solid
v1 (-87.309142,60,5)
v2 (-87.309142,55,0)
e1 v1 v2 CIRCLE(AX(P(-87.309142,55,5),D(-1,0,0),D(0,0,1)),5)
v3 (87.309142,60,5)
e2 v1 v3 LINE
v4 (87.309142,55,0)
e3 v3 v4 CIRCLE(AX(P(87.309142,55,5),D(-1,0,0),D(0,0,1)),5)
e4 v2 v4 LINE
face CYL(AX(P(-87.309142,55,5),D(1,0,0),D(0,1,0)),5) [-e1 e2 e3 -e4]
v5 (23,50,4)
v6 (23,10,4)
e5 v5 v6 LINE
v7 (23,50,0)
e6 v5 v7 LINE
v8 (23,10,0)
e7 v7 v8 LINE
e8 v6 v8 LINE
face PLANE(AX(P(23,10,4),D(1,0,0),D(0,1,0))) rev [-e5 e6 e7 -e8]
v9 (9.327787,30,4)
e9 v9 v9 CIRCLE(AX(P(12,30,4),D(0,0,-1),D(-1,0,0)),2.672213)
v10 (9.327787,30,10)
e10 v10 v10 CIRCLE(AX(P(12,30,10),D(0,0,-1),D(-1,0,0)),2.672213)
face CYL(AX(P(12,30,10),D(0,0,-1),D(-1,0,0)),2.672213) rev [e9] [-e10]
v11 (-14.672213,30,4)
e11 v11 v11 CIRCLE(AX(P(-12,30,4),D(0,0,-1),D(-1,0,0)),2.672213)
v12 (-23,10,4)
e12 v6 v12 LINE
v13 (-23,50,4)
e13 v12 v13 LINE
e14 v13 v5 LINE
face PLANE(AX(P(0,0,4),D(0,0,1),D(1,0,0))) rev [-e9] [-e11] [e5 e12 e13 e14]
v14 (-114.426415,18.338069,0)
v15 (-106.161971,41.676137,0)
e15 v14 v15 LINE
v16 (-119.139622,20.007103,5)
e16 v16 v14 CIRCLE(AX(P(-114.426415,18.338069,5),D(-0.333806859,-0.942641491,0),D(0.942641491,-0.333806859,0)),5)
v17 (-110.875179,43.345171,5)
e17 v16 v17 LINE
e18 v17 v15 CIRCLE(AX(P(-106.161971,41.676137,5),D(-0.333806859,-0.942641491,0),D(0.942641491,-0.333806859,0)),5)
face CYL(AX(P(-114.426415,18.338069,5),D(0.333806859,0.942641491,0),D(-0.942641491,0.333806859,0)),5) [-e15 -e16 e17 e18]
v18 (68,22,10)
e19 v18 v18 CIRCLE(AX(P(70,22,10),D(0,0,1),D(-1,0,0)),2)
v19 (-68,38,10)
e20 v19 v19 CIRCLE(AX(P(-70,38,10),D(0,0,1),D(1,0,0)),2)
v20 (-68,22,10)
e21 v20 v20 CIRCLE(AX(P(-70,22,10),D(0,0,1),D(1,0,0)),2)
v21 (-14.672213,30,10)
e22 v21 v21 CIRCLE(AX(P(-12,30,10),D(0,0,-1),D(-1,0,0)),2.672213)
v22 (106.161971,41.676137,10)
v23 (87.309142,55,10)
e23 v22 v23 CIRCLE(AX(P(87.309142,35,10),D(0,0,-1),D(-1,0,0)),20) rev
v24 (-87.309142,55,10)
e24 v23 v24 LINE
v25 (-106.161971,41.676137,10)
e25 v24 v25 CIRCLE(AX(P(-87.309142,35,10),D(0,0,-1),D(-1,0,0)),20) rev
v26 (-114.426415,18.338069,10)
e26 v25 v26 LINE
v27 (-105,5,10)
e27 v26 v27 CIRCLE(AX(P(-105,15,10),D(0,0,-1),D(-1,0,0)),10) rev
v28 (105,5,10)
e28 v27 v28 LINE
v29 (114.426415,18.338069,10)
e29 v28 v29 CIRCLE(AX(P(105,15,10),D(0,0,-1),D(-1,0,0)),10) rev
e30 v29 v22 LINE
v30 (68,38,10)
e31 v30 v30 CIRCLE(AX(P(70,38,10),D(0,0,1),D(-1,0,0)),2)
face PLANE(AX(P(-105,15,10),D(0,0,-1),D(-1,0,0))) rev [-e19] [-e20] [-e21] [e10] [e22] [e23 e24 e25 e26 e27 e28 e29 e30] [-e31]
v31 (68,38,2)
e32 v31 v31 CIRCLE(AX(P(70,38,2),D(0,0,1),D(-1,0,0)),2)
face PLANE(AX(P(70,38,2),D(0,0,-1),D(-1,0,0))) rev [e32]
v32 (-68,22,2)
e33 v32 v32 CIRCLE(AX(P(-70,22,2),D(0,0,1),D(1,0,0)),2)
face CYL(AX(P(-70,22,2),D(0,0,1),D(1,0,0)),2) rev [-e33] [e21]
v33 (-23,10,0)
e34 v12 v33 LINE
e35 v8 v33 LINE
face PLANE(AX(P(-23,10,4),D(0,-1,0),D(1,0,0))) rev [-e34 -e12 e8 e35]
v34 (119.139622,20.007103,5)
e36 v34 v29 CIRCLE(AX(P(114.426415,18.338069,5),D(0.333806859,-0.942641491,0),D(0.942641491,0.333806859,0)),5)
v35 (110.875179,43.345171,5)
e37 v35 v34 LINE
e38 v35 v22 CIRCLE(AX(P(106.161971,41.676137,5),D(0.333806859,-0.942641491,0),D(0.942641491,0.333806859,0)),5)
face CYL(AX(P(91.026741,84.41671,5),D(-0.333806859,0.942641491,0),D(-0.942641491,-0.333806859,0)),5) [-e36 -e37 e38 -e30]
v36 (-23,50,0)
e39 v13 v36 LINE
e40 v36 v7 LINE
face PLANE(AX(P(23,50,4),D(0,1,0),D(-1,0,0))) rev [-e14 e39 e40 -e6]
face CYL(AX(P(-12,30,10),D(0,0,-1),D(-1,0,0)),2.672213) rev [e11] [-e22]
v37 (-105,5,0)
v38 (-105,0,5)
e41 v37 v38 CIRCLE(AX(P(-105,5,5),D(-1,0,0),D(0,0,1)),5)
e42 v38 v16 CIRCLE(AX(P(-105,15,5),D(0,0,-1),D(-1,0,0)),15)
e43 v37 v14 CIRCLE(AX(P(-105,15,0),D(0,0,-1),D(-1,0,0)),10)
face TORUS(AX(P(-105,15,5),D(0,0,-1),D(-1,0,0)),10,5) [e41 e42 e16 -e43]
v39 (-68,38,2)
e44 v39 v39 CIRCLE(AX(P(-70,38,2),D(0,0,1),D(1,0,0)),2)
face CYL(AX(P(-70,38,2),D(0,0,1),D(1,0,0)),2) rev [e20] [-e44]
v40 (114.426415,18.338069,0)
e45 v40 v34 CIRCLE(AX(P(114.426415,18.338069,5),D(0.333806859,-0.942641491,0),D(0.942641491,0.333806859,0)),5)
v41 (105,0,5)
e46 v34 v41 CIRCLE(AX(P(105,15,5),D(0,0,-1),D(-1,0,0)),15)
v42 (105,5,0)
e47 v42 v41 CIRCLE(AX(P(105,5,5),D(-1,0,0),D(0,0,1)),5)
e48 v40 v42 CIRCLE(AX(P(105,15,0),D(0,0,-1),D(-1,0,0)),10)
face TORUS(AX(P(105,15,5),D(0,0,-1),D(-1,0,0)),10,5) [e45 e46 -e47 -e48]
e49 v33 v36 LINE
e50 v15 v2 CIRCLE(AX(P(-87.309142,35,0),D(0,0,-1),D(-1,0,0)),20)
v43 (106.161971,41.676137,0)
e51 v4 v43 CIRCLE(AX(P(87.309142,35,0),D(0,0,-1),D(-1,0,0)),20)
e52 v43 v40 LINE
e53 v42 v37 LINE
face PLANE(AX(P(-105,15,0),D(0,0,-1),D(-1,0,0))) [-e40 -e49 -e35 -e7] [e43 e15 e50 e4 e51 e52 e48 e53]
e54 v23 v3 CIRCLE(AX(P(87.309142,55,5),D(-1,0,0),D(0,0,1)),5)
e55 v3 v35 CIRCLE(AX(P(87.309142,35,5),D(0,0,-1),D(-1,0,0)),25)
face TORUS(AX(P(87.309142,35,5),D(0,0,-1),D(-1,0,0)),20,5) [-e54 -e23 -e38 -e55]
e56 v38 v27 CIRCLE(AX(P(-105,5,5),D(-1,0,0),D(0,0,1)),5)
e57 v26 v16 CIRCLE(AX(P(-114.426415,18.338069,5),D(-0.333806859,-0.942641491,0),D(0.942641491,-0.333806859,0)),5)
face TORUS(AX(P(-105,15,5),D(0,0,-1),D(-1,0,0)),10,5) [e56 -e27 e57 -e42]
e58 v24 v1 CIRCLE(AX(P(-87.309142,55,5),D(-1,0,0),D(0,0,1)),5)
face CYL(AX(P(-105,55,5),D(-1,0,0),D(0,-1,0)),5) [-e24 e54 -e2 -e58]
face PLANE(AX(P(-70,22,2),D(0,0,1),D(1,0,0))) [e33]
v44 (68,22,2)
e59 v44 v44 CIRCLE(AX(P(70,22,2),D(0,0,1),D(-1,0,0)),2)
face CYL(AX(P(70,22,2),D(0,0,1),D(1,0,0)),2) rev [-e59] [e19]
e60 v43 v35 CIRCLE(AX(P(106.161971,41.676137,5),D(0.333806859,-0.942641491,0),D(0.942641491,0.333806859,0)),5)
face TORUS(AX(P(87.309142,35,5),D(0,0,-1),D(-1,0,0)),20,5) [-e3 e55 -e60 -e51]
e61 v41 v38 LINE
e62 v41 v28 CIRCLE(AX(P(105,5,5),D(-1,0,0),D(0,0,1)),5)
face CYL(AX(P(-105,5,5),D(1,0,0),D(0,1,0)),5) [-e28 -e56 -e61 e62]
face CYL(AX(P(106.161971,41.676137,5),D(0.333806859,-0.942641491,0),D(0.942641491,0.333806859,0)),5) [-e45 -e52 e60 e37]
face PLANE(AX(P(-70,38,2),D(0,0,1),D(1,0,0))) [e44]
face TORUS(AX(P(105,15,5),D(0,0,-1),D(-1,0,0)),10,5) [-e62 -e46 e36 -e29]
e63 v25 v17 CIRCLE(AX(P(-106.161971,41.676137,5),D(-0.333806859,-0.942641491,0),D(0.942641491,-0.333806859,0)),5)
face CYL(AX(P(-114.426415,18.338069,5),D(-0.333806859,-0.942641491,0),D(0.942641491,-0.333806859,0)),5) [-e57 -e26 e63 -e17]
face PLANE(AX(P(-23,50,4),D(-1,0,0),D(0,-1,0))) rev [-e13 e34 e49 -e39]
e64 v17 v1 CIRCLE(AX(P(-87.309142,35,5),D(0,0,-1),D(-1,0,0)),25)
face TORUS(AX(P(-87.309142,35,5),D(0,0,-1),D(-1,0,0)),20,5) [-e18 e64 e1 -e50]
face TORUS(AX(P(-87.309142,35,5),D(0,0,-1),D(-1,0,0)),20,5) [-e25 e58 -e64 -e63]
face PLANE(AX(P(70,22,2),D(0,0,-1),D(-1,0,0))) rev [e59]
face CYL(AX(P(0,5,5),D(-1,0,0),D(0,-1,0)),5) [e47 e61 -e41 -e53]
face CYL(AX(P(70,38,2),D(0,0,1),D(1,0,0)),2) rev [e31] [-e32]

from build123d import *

# Parameters (mm, degrees)
BOSS_EXTRUDE1_DEPTH = 10
SKETCH2_R           = 2
CUT_EXTRUDE1_DEPTH  = 8
FILLET1_R           = 5
SKETCH3_W           = 46
SKETCH3_H           = 40
CUT_EXTRUDE2_DEPTH  = 4
SKETCH4_R           = 2.672212582
CUT_EXTRUDE3_DEPTH  = 135.298175803


with BuildPart() as part:
    # Sketch1 → Boss-Extrude1 (new body)
    with BuildSketch(Plane.XY):
        with BuildLine():
            Line((0, 0), (-105, 0))
            ThreePointArc((-105, 0), (-117.249623327, 6.342822149), (-119.139622366, 20.007102889))
            Line((-119.139622366, 20.007102889), (-110.875178831, 43.345171481))
            ThreePointArc((-110.875178831, 43.345171481), (-101.737771304, 55.416038879), (-87.309141554, 60))
            Line((-87.309141554, 60), (87.309141554, 60))
            ThreePointArc((87.309141554, 60), (101.737771304, 55.416038879), (110.875178831, 43.345171481))
            Line((110.875178831, 43.345171481), (119.139622366, 20.007102889))
            ThreePointArc((119.139622366, 20.007102889), (117.249623327, 6.342822149), (105, 0))
            Line((105, 0), (0, 0))
        make_face()
    extrude(amount=BOSS_EXTRUDE1_DEPTH)

    # Sketch2 → Cut-Extrude1 (cut)
    with BuildSketch(Plane.XY.offset(10)):
        with Locations((-70, 22)):
            Circle(SKETCH2_R)
        with Locations((-70, 38)):
            Circle(SKETCH2_R)
        with Locations(Location((70, 22, 0), (0, 0, 180))):
            Circle(SKETCH2_R)
        with Locations(Location((70, 38, 0), (0, 0, 180))):
            Circle(SKETCH2_R)
    extrude(amount=-CUT_EXTRUDE1_DEPTH, mode=Mode.SUBTRACT)

    # Fillet1
    fillet1_edges = [part.edges().sort_by_distance(p)[0] for p in [
        (-117.249623327, 6.342822149, 0),
        (-115.007400599, 31.676137185, 0),
        (-101.737771304, 55.416038879, 0),
        (0, 60, 0),
        (101.737771304, 55.416038879, 0),
        (115.007400599, 31.676137185, 0),
        (117.249623327, 6.342822149, 0),
        (-117.249623327, 6.342822149, 10),
        (-115.007400599, 31.676137185, 10),
        (-101.737771304, 55.416038879, 10),
        (0, 60, 10),
        (101.737771304, 55.416038879, 10),
        (115.007400599, 31.676137185, 10),
        (117.249623327, 6.342822149, 10),
        (0, 0, 0),
        (0, 0, 10),
    ]]
    fillet(fillet1_edges, radius=FILLET1_R - 0.0001)  # a hair under: the kernel refuses the full size

    # Sketch3 → Cut-Extrude2 (cut)
    with BuildSketch(Plane(origin=(0, 0, 0), x_dir=(-1, 0, 0), z_dir=(0, 0, -1))):
        with Locations((0, 30)):
            Rectangle(SKETCH3_W, SKETCH3_H)
    extrude(amount=-CUT_EXTRUDE2_DEPTH, mode=Mode.SUBTRACT)

    # Sketch4 → Cut-Extrude3 (cut, through all)
    with BuildSketch(Plane(origin=(0, 0, 4), x_dir=(-1, 0, 0), z_dir=(0, 0, -1))):
        with Locations((-12, 30)):
            Circle(SKETCH4_R)
        with Locations((12, 30)):
            Circle(SKETCH4_R)
    extrude(amount=-CUT_EXTRUDE3_DEPTH, mode=Mode.SUBTRACT)


solid = part.part
